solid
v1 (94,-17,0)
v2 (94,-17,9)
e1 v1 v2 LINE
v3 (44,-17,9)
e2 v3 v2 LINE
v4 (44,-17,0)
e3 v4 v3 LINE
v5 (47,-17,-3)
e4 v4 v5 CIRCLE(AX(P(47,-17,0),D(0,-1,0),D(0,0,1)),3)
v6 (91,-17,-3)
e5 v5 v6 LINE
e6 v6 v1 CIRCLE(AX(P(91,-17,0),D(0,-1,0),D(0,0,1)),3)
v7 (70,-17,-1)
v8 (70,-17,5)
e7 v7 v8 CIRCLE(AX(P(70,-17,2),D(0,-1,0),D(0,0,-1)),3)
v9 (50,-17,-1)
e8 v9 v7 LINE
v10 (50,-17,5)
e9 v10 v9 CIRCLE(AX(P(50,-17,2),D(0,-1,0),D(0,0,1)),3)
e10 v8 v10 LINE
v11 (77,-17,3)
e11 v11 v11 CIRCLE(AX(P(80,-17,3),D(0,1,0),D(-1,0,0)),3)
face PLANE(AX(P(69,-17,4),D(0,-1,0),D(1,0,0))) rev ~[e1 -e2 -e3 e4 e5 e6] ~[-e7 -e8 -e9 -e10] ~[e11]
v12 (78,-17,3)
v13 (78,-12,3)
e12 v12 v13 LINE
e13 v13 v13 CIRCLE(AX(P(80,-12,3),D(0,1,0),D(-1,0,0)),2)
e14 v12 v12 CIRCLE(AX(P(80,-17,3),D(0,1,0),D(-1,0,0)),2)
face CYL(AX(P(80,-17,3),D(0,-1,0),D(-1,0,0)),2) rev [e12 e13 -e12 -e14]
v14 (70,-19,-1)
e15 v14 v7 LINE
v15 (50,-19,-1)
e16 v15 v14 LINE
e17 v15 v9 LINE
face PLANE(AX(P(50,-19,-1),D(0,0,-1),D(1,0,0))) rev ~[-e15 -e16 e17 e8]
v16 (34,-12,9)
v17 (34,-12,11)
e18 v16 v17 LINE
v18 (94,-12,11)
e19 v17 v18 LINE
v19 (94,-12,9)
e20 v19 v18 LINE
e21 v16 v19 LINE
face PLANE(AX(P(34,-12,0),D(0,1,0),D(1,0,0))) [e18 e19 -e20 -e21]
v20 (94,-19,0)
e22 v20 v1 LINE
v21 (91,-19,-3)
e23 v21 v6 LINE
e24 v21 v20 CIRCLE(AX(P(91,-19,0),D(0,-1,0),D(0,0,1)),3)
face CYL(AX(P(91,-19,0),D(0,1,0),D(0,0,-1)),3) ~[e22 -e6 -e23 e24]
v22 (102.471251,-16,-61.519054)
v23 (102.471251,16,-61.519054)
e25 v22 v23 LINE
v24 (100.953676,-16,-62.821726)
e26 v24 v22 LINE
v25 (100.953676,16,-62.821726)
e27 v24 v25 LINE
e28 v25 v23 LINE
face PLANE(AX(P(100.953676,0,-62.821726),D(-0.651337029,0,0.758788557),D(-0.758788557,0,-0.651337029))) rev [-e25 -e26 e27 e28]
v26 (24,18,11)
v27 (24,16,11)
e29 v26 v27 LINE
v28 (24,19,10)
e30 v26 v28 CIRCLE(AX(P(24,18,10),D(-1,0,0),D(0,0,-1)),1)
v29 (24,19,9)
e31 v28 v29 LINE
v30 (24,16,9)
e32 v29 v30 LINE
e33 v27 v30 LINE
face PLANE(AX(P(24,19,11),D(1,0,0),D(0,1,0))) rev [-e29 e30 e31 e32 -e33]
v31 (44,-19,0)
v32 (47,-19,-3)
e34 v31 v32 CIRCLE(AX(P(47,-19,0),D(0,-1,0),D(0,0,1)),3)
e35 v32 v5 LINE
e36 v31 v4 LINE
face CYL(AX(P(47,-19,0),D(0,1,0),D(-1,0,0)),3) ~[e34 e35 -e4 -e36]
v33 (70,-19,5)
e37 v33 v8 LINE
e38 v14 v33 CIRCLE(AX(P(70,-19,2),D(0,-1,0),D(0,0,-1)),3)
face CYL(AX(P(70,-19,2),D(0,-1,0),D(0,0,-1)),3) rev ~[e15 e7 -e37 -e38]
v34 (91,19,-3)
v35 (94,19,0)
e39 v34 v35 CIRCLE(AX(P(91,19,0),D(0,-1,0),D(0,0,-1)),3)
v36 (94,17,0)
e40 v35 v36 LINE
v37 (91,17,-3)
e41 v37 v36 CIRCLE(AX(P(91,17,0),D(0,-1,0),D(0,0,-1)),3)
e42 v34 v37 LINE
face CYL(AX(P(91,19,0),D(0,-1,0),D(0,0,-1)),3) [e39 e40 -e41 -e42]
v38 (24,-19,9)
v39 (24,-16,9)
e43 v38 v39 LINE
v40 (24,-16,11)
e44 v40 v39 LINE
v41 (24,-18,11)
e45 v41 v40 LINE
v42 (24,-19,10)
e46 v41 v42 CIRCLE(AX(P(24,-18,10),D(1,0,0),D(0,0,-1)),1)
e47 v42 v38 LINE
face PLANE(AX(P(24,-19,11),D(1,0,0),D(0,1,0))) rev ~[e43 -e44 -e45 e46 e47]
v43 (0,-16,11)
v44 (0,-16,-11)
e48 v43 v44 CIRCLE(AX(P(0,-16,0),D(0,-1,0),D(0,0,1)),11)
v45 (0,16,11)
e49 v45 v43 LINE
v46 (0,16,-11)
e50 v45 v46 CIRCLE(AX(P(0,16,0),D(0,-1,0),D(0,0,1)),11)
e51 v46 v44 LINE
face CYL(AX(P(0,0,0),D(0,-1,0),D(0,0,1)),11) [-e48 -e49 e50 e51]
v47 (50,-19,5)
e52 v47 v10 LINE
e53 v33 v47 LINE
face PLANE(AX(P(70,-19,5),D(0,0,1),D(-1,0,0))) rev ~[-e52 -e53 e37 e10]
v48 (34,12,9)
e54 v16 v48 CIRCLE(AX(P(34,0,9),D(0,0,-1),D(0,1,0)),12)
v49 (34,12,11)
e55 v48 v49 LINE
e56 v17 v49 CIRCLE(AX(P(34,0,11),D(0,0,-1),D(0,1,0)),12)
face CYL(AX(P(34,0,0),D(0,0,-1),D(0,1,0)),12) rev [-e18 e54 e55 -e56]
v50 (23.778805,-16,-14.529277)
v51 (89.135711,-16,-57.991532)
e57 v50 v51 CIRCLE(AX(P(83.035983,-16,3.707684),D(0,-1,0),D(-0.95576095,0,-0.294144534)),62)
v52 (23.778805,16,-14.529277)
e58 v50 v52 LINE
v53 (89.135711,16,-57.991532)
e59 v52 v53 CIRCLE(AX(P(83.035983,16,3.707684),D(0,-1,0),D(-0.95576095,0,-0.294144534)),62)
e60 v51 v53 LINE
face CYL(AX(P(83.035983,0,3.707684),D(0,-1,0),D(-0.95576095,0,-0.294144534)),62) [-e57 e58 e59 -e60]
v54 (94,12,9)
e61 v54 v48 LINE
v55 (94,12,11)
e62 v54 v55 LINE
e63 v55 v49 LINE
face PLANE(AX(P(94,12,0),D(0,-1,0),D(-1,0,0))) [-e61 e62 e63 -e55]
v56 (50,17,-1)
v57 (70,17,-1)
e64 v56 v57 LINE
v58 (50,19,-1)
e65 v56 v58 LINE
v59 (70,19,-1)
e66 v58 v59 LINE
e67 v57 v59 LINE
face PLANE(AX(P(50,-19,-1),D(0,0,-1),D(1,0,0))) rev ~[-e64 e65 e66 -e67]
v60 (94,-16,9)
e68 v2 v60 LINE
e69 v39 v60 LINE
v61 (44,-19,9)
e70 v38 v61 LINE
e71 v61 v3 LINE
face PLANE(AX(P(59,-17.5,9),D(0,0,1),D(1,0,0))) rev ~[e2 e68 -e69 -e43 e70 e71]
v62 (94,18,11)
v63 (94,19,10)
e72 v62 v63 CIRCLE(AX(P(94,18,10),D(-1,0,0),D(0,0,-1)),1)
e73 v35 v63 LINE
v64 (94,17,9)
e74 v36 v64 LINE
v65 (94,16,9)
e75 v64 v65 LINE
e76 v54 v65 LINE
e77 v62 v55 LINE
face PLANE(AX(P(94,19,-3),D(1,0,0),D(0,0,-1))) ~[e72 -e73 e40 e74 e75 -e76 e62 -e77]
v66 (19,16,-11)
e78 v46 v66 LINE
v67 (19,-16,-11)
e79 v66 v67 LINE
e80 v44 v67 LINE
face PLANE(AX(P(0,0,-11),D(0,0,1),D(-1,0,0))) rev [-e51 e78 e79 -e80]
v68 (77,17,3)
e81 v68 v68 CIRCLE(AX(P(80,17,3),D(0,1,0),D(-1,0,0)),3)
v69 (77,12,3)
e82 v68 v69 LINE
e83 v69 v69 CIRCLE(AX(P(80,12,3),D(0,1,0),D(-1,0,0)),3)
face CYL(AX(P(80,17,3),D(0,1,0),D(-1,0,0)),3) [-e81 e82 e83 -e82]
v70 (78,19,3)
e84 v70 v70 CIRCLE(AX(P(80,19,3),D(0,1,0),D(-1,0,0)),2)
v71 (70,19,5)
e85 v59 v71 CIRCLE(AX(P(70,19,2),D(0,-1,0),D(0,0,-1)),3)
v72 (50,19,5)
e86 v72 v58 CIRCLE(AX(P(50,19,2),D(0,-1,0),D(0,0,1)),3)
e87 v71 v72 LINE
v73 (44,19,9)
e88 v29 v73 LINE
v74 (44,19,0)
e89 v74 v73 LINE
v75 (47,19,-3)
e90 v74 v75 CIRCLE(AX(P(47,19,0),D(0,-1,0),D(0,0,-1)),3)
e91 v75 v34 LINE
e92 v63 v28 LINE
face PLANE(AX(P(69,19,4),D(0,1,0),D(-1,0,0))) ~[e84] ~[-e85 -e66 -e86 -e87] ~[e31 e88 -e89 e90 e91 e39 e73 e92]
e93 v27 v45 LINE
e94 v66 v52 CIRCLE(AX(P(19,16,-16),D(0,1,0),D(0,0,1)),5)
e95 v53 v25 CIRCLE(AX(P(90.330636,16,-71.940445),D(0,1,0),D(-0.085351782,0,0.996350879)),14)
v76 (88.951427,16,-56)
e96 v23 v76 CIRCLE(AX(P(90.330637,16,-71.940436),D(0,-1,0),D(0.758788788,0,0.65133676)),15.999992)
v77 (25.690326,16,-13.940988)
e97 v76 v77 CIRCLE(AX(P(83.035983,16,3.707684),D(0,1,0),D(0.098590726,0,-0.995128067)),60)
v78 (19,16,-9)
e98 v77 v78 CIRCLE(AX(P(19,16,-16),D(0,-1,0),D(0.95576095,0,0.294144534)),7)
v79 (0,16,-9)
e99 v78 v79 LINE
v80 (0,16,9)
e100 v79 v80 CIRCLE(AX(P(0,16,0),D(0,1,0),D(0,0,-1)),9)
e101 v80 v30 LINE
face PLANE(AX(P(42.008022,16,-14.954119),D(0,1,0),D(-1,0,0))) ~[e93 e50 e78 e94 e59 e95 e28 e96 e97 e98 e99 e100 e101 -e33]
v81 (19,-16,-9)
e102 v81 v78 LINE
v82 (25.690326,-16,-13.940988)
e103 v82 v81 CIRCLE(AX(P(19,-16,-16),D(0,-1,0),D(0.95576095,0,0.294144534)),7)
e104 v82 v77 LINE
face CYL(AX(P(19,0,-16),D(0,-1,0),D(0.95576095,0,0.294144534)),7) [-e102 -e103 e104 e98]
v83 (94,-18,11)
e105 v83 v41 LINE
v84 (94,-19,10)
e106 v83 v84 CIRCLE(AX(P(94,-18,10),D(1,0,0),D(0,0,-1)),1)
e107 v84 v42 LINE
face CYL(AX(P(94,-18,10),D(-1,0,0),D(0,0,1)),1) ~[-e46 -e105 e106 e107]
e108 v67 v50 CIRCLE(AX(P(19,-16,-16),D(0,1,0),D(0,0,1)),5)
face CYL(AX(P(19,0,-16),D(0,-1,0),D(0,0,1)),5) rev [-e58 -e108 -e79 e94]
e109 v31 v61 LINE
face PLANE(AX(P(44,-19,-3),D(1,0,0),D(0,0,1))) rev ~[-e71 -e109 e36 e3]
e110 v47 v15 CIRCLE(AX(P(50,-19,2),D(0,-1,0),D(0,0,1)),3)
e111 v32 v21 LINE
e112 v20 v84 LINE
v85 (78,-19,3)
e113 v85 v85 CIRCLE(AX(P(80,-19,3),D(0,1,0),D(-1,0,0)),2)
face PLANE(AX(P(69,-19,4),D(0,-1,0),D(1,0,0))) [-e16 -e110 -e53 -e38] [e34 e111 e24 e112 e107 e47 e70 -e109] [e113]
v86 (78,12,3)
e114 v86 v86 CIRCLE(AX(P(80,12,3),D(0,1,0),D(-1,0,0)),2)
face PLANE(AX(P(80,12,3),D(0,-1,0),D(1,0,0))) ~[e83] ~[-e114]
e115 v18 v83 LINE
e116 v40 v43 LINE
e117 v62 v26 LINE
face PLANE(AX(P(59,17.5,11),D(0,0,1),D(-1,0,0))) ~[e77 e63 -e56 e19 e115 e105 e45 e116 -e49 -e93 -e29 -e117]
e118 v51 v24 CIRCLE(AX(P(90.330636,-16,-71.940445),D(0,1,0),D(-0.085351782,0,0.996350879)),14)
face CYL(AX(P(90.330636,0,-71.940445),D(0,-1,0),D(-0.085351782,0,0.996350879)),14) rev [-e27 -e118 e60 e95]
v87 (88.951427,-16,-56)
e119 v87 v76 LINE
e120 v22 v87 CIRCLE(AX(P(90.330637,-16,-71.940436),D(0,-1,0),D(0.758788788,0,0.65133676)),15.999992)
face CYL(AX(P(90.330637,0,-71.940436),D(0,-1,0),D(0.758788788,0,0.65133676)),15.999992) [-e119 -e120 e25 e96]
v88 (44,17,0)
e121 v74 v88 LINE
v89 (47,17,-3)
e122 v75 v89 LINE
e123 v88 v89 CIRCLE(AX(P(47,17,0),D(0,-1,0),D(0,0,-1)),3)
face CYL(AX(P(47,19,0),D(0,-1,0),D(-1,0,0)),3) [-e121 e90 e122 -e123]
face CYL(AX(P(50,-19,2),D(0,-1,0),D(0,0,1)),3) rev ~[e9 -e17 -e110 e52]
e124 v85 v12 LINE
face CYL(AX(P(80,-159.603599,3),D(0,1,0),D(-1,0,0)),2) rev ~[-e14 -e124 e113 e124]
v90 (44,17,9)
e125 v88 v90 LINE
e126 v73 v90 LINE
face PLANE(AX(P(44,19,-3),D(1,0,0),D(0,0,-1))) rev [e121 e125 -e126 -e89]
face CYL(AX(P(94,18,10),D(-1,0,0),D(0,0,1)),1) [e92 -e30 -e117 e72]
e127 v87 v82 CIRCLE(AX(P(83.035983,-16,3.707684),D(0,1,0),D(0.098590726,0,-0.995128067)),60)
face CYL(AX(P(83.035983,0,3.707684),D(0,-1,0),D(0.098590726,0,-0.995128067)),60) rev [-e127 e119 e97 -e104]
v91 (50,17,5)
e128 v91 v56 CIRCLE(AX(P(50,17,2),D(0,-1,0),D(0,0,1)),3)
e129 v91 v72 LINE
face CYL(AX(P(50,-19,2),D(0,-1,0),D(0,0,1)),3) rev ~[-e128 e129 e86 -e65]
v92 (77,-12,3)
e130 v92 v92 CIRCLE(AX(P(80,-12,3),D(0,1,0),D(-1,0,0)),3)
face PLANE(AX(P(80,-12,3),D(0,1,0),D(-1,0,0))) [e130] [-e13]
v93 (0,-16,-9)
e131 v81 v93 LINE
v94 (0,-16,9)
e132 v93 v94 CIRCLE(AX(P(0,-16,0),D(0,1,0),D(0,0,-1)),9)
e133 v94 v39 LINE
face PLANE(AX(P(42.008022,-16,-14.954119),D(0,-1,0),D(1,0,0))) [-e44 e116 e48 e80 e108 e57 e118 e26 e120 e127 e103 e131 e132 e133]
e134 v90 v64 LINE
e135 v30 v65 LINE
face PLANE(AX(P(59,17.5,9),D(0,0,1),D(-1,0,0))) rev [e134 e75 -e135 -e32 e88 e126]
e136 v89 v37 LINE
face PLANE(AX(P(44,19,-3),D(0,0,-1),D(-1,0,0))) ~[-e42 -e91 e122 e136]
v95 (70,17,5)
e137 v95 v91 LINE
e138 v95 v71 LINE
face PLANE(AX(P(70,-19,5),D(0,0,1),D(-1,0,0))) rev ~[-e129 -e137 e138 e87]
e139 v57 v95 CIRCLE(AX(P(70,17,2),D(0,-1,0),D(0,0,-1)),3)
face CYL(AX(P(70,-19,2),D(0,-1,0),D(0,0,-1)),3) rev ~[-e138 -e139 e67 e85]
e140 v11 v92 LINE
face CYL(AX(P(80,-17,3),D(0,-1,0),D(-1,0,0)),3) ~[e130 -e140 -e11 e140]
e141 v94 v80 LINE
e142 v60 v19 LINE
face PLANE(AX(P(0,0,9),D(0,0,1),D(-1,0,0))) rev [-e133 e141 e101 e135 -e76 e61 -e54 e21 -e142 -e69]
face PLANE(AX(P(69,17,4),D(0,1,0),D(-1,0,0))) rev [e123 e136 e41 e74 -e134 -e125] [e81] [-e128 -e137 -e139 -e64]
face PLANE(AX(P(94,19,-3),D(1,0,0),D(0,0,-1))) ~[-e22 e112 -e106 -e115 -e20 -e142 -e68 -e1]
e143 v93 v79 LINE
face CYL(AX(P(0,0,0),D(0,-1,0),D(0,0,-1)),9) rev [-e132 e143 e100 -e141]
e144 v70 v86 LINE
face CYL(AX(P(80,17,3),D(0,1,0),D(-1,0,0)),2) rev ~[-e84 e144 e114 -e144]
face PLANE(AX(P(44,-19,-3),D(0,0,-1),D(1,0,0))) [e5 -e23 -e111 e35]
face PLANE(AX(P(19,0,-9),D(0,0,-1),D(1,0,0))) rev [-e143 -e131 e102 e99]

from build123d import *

# Parameters (mm, degrees)
F1_DEPTH  = 16
F2_W      = 70
F2_H      = 3
F3_DEPTH  = 2
F4_W      = 50
F4_H      = 14
F5_DEPTH  = 2
F6_R      = 1
F9_DEPTH  = 32.3
F11_DEPTH = 38.001
F13_D     = 4
F14_R     = 3
F14_R_2   = 2
F15_DEPTH = 5
F16_R     = 3


# Not quite as in the source:
# - ends of sketch curves that miss each other by under 0.0002 mm in the source are joined
# - a pattern or mirror of a feature is missing from the dataset's text; its kind, count and spacing are read off the source's solid


with BuildPart() as f1:
    # F0 (on Front) → F1 (new body)
    with BuildSketch(Plane.XZ):
        with BuildLine():
            Line((94, 10.9999997337), (0, 10.9999997337))
            ThreePointArc((0, 10.9999997337), (-10.9999997337, 0), (0, -10.9999997337))
            Line((0, -10.9999997337), (19, -10.9999997337))
            ThreePointArc((19, -10.9999997337), (21.9703860558, -11.9779596195), (23.7788047483, -14.5292770618))
            ThreePointArc((23.7788047483, -14.5292770618), (48.7042113744, -47.9191442908), (89.135710582, -57.9915323328))
            ThreePointArc((89.135710582, -57.9915323328), (95.6273356348, -58.9810862831), (100.9536755577, -62.8217263174))
            Line((100.9536755577, -62.8217263174), (102.4712510554, -61.5190536469))
            ThreePointArc((102.4712510554, -61.5190536469), (96.3776978188, -57.1271725396), (88.9514269277, -56))
            ThreePointArc((88.9514269277, -56), (49.8169100213, -46.2572353593), (25.6903263931, -13.9409880714))
            ThreePointArc((25.6903263931, -13.9409880714), (23.1585403199, -10.3691437881), (19, -9))
            Line((19, -9), (0, -9))
            ThreePointArc((0, -9), (-9, 0), (0, 9))
            Line((0, 9), (94, 9))
            Line((94, 9), (94, 10.9999997337))
        make_face()
    extrude(amount=F1_DEPTH)

    # F2 (on face) → F3 (join)
    with BuildSketch(Plane.XY.offset(10.9999997337)):
        with Locations((59, -17.5)):
            Rectangle(F2_W, F2_H)
    extrude(amount=-F3_DEPTH)

    # F4 (on face) → F5 (join)
    with BuildSketch(Plane.XZ.offset(19)):
        with Locations((69, 3.9999997337)):
            Rectangle(F4_W, F4_H)
    extrude(amount=-F5_DEPTH)

    # F6
    f6_edges = [f1.edges().sort_by_distance(p)[0] for p in [
        (59, -19, 11),
    ]]
    fillet(f6_edges, radius=F6_R)

    # F7: F1 across plane


with BuildPart() as f1_1:
    add(f1.part)
    add(f1.part.mirror(Plane.XZ))

    # F8 (on Top) → F9 (cut)
    with BuildSketch(Plane.XY):
        with BuildLine():
            Line((94, 12), (34, 12))
            ThreePointArc((34, 12), (22, 0), (34, -12))
            Line((34, -12), (94, -12))
            Line((94, -12), (94, 12))
        make_face()
    extrude(amount=F9_DEPTH, mode=Mode.SUBTRACT)

    # F10 (on face) → F11 (cut, through all)
    with BuildSketch(Plane.XZ.offset(19)):
        with BuildLine():
            ThreePointArc((50, 4.9999997337), (47, 1.9999997337), (50, -1.0000002663))
            Line((50, -1.0000002663), (70, -1.0000002663))
            ThreePointArc((70, -1.0000002663), (73, 1.9999997337), (70, 4.9999997337))
            Line((70, 4.9999997337), (50, 4.9999997337))
        make_face()
    extrude(amount=-F11_DEPTH, mode=Mode.SUBTRACT)

    # F13 (through all)
    with Locations(Plane.XZ.offset(19)):
        with Locations((80, 2.9999997337)):
            Hole(F13_D / 2)

    # F14 (on face) → F15 (join)
    with BuildSketch(Plane(origin=(0, -17, 0), x_dir=(-1, 0, 0), z_dir=(0, 1, 0))):
        with Locations((-80, 2.9999997337)):
            Circle(F14_R)
        with Locations((-80, 2.9999997337)):
            Circle(F14_R_2, mode=Mode.SUBTRACT)
    f15 = extrude(amount=F15_DEPTH)

    # F15_copies: F15 across plane
    add(f15.mirror(Plane.ZX))

    # F16
    f16_edges = [f1_1.edges().sort_by_distance(p)[0] for p in [
        (94, -18, -3),
        (94, 18, -3),
        (44, -18, -3),
        (44, 18, -3),
    ]]
    fillet(f16_edges, radius=F16_R)


solid = f1_1.part
